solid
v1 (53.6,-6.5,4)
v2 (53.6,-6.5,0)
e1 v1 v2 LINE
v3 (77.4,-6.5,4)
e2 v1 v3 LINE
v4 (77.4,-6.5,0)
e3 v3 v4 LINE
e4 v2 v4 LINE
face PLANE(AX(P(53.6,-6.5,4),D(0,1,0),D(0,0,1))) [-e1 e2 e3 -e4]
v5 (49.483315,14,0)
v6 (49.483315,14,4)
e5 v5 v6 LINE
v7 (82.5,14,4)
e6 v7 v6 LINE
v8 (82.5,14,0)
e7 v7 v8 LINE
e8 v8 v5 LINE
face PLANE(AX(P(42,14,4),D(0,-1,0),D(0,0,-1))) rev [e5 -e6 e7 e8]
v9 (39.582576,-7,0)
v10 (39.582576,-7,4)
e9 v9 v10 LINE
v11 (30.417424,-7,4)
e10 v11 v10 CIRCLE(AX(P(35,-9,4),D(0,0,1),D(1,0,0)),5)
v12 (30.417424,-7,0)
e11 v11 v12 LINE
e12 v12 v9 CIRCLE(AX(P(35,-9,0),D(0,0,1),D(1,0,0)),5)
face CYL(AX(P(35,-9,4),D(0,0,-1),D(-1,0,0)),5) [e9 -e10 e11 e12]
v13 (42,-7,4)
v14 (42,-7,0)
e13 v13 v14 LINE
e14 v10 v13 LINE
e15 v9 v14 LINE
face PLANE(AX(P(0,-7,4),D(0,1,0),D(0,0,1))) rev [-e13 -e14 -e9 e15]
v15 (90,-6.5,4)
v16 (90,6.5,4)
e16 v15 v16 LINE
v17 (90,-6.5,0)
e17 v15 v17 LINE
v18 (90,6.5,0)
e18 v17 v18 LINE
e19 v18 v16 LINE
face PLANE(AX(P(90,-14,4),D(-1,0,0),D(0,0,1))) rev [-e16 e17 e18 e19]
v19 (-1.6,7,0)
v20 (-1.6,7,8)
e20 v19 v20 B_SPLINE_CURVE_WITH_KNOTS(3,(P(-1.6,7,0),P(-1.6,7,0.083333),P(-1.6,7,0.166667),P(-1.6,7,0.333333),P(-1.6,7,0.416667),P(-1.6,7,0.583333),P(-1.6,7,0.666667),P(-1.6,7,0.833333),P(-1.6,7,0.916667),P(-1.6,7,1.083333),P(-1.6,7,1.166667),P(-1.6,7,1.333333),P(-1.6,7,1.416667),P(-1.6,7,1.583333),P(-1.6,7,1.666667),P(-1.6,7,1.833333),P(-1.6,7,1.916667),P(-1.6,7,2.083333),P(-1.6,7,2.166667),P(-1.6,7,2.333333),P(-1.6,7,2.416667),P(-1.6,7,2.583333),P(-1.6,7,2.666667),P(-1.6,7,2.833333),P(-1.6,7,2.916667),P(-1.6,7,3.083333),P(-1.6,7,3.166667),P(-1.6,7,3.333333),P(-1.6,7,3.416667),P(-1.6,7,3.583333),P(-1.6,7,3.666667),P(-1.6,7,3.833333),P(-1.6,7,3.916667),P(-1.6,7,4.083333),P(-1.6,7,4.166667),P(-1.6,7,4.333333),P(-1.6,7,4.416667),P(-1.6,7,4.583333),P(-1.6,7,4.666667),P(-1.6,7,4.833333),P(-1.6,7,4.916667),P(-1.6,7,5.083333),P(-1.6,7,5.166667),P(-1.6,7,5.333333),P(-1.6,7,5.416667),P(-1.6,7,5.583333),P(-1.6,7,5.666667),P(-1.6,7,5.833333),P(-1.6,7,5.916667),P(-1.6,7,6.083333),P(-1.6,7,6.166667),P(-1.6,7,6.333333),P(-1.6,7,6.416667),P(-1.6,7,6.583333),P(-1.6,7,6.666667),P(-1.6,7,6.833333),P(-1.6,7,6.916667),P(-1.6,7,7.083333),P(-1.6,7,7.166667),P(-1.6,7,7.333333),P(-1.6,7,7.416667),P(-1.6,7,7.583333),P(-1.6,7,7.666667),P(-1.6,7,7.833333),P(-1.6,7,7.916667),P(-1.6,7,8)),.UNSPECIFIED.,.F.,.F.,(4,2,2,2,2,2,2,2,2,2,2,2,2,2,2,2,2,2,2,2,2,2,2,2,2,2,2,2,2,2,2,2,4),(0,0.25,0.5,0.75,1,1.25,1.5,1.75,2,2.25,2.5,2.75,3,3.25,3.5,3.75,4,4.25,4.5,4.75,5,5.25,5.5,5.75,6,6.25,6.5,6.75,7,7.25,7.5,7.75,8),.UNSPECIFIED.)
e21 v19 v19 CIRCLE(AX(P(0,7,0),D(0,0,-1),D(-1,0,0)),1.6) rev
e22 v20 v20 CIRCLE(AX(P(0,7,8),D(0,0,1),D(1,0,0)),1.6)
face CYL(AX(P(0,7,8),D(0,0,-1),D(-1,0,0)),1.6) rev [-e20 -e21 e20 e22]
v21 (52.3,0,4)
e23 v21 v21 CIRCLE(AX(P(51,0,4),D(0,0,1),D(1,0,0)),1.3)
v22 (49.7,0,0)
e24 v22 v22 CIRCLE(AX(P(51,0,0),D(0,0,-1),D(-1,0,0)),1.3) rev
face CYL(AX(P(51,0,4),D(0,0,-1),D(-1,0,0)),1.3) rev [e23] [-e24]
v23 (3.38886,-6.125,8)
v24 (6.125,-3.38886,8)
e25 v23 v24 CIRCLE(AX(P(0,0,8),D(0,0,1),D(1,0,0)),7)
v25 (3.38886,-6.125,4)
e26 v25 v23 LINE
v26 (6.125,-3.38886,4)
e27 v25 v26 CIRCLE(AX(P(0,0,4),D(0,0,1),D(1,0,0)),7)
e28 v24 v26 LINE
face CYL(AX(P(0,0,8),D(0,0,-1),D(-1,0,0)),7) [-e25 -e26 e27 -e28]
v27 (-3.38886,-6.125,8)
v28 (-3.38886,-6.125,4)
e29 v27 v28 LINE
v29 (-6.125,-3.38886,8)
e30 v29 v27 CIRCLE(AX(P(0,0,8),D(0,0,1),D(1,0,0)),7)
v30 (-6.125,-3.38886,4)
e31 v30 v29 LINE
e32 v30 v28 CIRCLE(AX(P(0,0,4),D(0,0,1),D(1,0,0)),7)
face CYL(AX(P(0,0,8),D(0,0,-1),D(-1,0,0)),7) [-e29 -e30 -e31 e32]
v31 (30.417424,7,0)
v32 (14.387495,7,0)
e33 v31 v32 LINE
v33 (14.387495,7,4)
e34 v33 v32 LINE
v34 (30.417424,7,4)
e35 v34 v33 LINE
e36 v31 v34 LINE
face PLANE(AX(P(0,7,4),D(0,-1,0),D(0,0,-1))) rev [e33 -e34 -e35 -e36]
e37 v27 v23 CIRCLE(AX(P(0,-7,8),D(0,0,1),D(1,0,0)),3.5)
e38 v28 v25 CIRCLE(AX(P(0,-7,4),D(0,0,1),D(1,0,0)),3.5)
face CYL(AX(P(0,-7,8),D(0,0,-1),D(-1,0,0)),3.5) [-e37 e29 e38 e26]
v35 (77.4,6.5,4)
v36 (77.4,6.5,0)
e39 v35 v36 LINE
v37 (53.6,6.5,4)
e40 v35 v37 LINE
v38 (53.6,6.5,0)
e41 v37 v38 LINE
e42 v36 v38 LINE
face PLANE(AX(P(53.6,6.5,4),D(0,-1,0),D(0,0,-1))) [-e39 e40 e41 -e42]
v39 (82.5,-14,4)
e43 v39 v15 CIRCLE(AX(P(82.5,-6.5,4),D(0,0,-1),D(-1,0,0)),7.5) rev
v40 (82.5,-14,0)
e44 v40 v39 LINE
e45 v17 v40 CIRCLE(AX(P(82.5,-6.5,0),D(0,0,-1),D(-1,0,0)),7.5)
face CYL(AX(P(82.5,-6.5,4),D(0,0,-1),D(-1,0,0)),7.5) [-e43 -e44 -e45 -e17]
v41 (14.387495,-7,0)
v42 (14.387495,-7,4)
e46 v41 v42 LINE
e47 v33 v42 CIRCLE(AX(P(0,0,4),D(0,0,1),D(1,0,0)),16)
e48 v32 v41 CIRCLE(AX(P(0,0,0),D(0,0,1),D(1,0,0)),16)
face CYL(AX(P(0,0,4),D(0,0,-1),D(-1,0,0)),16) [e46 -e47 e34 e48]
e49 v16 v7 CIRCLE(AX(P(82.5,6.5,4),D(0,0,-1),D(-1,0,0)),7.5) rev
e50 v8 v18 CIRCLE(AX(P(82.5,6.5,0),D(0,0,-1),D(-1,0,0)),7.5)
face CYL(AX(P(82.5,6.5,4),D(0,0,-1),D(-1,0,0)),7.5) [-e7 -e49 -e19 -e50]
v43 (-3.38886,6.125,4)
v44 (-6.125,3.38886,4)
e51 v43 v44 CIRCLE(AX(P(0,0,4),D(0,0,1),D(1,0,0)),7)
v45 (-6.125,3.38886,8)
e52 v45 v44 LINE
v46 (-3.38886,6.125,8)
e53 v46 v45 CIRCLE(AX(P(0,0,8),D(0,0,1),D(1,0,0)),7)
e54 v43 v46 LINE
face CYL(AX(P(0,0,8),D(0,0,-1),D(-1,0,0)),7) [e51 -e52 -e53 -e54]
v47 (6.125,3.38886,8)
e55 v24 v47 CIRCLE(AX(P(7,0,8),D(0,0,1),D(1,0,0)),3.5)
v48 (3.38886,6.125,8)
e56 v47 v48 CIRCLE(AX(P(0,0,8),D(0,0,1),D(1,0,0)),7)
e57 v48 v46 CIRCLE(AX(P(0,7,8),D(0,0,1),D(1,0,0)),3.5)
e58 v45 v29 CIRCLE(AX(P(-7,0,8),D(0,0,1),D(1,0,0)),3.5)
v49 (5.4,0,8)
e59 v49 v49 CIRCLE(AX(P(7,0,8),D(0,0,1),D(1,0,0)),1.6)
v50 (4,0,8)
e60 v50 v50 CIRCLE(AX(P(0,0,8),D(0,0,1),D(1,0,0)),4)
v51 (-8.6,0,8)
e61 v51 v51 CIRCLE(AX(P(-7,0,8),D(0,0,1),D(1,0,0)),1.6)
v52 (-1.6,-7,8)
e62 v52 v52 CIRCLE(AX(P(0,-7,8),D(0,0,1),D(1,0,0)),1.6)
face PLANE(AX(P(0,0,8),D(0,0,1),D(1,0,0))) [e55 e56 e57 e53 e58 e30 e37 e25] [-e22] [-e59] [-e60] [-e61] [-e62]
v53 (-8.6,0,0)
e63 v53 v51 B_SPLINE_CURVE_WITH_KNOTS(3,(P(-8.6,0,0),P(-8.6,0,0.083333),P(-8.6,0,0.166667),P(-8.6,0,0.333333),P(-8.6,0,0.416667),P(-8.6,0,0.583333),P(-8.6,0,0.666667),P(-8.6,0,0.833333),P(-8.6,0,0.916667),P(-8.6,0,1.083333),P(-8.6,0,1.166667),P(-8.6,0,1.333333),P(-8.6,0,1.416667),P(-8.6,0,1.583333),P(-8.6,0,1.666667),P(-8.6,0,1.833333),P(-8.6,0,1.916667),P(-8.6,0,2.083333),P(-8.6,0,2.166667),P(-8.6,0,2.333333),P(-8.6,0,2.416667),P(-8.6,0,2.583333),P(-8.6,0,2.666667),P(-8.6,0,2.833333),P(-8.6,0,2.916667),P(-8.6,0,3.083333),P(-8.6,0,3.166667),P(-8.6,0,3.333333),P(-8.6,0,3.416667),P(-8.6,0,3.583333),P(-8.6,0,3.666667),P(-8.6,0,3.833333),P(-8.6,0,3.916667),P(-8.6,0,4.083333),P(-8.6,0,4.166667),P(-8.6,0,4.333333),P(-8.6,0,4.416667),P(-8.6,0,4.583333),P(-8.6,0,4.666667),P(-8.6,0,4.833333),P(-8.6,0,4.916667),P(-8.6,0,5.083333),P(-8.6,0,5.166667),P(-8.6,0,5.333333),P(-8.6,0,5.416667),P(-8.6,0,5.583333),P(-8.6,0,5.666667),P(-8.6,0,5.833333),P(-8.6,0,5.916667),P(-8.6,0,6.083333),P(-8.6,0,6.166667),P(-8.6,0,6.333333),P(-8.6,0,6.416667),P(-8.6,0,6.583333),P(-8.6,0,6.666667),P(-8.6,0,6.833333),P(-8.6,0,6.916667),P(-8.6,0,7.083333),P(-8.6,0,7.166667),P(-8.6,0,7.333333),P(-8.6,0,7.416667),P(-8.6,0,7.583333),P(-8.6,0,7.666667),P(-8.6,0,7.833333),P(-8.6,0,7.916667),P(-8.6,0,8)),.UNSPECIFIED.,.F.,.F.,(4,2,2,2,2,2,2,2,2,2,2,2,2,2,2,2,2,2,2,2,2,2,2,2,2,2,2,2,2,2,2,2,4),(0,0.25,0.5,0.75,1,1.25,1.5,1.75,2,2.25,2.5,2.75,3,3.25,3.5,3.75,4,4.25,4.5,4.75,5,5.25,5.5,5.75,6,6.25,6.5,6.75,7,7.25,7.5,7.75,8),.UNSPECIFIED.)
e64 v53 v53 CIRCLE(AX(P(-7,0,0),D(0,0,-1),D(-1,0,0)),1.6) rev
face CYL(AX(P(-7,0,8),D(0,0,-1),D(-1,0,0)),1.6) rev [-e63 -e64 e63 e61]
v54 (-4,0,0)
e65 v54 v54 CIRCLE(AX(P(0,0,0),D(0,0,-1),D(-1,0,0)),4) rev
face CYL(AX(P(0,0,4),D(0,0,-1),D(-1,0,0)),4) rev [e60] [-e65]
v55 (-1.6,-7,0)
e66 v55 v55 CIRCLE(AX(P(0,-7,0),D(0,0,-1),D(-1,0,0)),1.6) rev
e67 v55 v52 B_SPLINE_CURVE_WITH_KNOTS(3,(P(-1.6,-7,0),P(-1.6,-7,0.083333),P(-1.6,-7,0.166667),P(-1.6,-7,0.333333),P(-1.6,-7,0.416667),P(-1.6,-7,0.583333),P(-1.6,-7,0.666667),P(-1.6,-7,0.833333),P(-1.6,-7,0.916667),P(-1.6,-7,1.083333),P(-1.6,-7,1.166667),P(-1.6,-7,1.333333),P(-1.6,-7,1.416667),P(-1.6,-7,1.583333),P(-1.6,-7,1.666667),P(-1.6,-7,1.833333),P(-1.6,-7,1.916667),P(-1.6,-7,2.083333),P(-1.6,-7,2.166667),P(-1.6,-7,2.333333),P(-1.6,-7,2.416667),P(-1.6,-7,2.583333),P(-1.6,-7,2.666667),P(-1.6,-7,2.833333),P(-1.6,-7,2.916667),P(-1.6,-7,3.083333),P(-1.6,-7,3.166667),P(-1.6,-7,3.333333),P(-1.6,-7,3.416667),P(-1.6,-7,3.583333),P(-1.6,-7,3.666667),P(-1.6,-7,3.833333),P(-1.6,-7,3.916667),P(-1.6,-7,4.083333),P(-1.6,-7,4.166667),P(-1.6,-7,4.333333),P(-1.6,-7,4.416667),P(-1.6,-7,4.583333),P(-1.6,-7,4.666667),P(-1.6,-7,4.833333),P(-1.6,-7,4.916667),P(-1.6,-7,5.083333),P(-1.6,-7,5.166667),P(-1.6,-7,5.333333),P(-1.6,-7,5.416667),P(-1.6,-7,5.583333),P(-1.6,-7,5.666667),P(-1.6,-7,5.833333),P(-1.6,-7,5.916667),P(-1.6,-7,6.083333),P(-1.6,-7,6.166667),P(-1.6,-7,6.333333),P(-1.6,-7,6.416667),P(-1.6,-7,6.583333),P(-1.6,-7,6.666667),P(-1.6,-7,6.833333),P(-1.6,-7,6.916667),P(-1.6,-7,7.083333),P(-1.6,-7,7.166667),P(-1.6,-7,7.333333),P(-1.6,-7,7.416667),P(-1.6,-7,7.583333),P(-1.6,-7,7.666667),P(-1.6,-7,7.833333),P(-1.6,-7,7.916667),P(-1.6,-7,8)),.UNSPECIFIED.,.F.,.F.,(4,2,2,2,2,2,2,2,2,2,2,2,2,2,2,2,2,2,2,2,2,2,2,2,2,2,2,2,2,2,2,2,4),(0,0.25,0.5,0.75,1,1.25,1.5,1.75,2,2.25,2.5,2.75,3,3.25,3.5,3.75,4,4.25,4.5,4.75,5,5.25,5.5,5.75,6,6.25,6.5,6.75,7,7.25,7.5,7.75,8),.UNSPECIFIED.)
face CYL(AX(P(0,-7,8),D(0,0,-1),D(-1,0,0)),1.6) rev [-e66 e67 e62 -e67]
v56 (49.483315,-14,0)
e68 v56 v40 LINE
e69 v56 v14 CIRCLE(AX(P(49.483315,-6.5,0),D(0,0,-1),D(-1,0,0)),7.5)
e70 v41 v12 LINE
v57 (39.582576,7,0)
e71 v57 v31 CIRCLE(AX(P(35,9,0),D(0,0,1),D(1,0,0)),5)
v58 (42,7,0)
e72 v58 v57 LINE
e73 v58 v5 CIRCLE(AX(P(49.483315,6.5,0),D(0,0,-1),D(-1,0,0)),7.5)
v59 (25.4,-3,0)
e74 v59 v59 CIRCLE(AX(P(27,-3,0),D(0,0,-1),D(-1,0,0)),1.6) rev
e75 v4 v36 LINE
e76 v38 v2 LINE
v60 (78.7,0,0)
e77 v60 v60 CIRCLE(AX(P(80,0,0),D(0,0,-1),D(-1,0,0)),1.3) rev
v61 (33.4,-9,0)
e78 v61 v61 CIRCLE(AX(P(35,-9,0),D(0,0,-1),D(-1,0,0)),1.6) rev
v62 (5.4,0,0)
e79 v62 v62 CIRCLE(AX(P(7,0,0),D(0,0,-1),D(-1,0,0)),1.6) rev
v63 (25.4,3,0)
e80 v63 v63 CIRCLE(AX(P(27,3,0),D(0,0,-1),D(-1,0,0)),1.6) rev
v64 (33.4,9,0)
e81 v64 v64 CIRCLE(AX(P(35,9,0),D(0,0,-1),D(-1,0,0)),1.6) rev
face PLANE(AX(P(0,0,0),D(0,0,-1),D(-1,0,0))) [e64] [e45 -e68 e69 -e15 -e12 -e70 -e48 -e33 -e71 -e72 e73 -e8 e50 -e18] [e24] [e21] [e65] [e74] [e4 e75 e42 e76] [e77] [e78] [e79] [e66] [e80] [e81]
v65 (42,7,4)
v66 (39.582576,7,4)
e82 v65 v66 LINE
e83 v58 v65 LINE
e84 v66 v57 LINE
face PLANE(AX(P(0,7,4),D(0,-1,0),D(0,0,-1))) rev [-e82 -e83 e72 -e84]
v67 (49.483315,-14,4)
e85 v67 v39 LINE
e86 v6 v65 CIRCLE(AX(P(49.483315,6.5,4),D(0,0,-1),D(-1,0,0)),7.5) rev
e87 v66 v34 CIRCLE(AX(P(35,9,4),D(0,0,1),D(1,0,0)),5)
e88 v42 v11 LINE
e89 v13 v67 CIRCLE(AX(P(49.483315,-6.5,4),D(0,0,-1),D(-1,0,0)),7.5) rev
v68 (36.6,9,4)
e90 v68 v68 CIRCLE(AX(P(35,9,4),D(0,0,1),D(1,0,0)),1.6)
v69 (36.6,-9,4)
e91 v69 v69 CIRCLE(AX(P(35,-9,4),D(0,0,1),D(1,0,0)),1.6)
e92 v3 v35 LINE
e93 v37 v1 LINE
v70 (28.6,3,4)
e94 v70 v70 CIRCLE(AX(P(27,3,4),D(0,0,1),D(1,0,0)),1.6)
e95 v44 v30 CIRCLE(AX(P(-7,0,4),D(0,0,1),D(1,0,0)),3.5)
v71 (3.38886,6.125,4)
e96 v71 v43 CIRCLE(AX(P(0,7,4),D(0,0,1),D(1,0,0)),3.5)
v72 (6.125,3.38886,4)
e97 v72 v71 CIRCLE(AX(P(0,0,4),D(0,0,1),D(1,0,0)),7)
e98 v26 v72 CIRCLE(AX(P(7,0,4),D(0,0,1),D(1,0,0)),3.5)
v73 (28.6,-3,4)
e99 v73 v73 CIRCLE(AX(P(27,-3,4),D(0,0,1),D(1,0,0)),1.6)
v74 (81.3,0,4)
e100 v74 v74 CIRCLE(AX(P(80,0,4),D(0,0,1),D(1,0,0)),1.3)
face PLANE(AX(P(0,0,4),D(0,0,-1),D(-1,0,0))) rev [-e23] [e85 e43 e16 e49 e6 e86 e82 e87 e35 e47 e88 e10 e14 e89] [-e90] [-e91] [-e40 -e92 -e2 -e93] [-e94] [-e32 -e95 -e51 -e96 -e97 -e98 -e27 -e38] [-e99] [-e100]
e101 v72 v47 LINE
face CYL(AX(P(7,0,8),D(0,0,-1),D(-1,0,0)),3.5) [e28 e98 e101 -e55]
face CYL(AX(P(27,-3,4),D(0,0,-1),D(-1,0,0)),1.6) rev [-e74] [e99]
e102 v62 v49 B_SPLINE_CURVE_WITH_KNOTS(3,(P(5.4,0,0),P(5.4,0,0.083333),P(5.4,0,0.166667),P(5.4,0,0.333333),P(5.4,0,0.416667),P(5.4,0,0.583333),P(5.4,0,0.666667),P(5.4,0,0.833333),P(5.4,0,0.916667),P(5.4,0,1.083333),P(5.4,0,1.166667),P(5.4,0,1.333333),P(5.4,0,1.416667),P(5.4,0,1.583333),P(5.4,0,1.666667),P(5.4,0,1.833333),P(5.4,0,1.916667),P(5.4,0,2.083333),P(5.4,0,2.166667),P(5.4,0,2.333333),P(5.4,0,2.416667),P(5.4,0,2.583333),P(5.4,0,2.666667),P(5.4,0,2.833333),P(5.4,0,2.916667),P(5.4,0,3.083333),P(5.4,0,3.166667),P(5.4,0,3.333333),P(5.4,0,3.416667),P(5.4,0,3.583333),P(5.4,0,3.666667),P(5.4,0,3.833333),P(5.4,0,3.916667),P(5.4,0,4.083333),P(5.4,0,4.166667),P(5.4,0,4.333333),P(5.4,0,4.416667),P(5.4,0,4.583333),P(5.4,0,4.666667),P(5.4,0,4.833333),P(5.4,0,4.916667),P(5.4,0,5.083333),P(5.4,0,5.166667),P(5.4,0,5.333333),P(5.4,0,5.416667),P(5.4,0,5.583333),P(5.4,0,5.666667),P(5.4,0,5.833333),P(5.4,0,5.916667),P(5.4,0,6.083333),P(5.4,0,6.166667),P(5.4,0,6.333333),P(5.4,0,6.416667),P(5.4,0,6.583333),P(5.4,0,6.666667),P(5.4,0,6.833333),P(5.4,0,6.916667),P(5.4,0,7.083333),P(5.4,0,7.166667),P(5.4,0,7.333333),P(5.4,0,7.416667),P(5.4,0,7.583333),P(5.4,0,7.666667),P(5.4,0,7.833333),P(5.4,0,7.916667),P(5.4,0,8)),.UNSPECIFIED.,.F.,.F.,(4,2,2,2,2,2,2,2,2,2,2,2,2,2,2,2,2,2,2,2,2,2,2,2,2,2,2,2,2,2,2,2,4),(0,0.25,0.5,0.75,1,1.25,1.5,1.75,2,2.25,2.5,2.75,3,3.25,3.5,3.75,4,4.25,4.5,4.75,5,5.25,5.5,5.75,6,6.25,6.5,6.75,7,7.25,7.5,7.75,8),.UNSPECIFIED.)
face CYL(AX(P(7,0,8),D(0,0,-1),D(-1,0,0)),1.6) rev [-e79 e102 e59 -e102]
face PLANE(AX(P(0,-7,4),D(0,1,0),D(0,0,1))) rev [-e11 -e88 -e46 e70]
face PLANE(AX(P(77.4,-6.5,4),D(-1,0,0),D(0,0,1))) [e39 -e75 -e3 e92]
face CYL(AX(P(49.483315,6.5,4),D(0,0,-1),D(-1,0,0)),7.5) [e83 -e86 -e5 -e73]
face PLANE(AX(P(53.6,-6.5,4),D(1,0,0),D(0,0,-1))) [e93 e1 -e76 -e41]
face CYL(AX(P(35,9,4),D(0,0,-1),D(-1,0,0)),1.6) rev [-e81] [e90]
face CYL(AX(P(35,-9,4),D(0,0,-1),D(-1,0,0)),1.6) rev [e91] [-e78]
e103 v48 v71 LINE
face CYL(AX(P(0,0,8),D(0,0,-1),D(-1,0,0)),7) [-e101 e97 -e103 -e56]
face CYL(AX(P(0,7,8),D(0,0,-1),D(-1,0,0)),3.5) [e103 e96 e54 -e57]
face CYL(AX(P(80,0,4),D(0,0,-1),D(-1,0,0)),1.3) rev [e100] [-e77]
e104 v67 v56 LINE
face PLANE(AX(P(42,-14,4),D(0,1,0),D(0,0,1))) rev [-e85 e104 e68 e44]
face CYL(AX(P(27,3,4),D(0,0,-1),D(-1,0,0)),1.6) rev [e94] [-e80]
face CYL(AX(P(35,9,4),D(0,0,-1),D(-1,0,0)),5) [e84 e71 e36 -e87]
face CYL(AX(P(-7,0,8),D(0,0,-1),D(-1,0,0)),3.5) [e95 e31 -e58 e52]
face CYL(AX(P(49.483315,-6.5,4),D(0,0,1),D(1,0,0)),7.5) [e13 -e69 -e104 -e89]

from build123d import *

# Parameters (mm, degrees)
MAIN_WEB_PROFILE_W                      = 60
MAIN_WEB_PROFILE_H                      = 14
MAIN_WEB_DEPTH                          = 4
SHOULDER_HORN_FLANGE_PROFILE_R          = 16
SHOULDER_HORN_FLANGE_DEPTH              = 4
ELBOW_SERVO_MOUNT_PROFILE_W             = 48
ELBOW_SERVO_MOUNT_PROFILE_H             = 28
ELBOW_SERVO_MOUNT_DEPTH                 = 4
SG90_BODY_CLEARANCE_START               = -5
SG90_BODY_CLEARANCE_PROFILE_W           = 23.8
SG90_BODY_CLEARANCE_PROFILE_H           = 13
SG90_BODY_CLEARANCE_DEPTH               = 97.49863387
ELBOW_TAB_FASTENERS_START               = -50
ELBOW_TAB_FASTENERS_PROFILE_R           = 1.3
ELBOW_TAB_FASTENERS_DEPTH               = 142.49863387
SHOULDER_CENTER_SCREW_ACCESS_START      = -50
SHOULDER_CENTER_SCREW_ACCESS_PROFILE_R  = 4
SHOULDER_CENTER_SCREW_ACCESS_DEPTH      = 142.49863387
CABLE_TIE_HOLES_START                   = -50
CABLE_TIE_HOLES_PROFILE_R               = 1.6
CABLE_TIE_HOLES_DEPTH                   = 142.49863387
PASSIVE_LOWER_MOUNT_BOSS_PROFILE_R      = 5
PASSIVE_LOWER_MOUNT_BOSS_DEPTH          = 4
PASSIVE_UPPER_MOUNT_BOSS_PROFILE_R      = 5
PASSIVE_UPPER_MOUNT_BOSS_DEPTH          = 4
PASSIVE_CHEEK_STANDOFFS_START           = -50
PASSIVE_CHEEK_STANDOFFS_PROFILE_R       = 1.6
PASSIVE_CHEEK_STANDOFFS_DEPTH           = 142.49863387
SHOULDER_DOWEL_SUPPORT_HUB_START        = 4
SHOULDER_DOWEL_SUPPORT_HUB_PROFILE_R    = 7
SHOULDER_DOWEL_SUPPORT_HUB_PROFILE_R_2  = 4
SHOULDER_DOWEL_SUPPORT_HUB_DEPTH        = 4
RAISED_M3_WASHER_SEATS_HEIGHT8_START    = 4
RAISED_M3_WASHER_SEATS_PCD14_PROFILE_R  = 3.5
RAISED_M3_WASHER_SEATS_HEIGHT8_DEPTH    = 4
METAL_HORN_M3_CLEARANCE_PCD14_START     = -50
METAL_HORN_M3_CLEARANCE_PCD14_PROFILE_R = 1.6
METAL_HORN_M3_CLEARANCE_PCD14_DEPTH     = 142.760557976
RESTORE_SHOULDER_SLEEVE_BORE_START      = -50
RESTORE_SHOULDER_SLEEVE_BORE_PROFILE_R  = 4
RESTORE_SHOULDER_SLEEVE_BORE_DEPTH      = 142.760557976
FILLET1_R                               = 7.5


with BuildPart() as part:
    # Main_web_profile → Main_web (new body)
    with BuildSketch(Plane.XY):
        with Locations((30, 0)):
            Rectangle(MAIN_WEB_PROFILE_W, MAIN_WEB_PROFILE_H)
    extrude(amount=MAIN_WEB_DEPTH)

    # Shoulder_horn_flange_profile → Shoulder_horn_flange (add)
    with BuildSketch(Plane.XY):
        Circle(SHOULDER_HORN_FLANGE_PROFILE_R)
    extrude(amount=SHOULDER_HORN_FLANGE_DEPTH)

    # Elbow_servo_mount_profile → Elbow_servo_mount (add)
    with BuildSketch(Plane.XY):
        with Locations((66, 0)):
            Rectangle(ELBOW_SERVO_MOUNT_PROFILE_W, ELBOW_SERVO_MOUNT_PROFILE_H)
    extrude(amount=ELBOW_SERVO_MOUNT_DEPTH)

    # SG90_body_clearance_profile → SG90_body_clearance (cut, through all)
    with BuildSketch(Plane.XY.offset(SG90_BODY_CLEARANCE_START)):
        with Locations((65.5, 0)):
            Rectangle(SG90_BODY_CLEARANCE_PROFILE_W, SG90_BODY_CLEARANCE_PROFILE_H)
    extrude(amount=SG90_BODY_CLEARANCE_DEPTH, mode=Mode.SUBTRACT)

    # Elbow_tab_fasteners_profile → Elbow_tab_fasteners (cut, through all)
    with BuildSketch(Plane.XY.offset(ELBOW_TAB_FASTENERS_START)):
        with Locations(Location((51, 0, 0), (0, 0, 180))):
            Circle(ELBOW_TAB_FASTENERS_PROFILE_R)
        with Locations(Location((80, 0, 0), (0, 0, 180))):
            Circle(ELBOW_TAB_FASTENERS_PROFILE_R)
    extrude(amount=ELBOW_TAB_FASTENERS_DEPTH, mode=Mode.SUBTRACT)

    # Shoulder_center_screw_access_profile → Shoulder_center_screw_access (cut, through all)
    with BuildSketch(Plane.XY.offset(SHOULDER_CENTER_SCREW_ACCESS_START)):
        with Locations(Location((0, 0, 0), (0, 0, 180))):
            Circle(SHOULDER_CENTER_SCREW_ACCESS_PROFILE_R)
    extrude(amount=SHOULDER_CENTER_SCREW_ACCESS_DEPTH, mode=Mode.SUBTRACT)

    # Cable_tie_holes_profile → Cable_tie_holes (cut, through all)
    with BuildSketch(Plane.XY.offset(CABLE_TIE_HOLES_START)):
        with Locations(Location((27, -3, 0), (0, 0, 180))):
            Circle(CABLE_TIE_HOLES_PROFILE_R)
        with Locations(Location((27, 3, 0), (0, 0, 180))):
            Circle(CABLE_TIE_HOLES_PROFILE_R)
    extrude(amount=CABLE_TIE_HOLES_DEPTH, mode=Mode.SUBTRACT)

    # Passive_lower_mount_boss_profile → Passive_lower_mount_boss (add)
    with BuildSketch(Plane.XY):
        with Locations((35, -9)):
            Circle(PASSIVE_LOWER_MOUNT_BOSS_PROFILE_R)
    extrude(amount=PASSIVE_LOWER_MOUNT_BOSS_DEPTH)

    # Passive_upper_mount_boss_profile → Passive_upper_mount_boss (add)
    with BuildSketch(Plane.XY):
        with Locations((35, 9)):
            Circle(PASSIVE_UPPER_MOUNT_BOSS_PROFILE_R)
    extrude(amount=PASSIVE_UPPER_MOUNT_BOSS_DEPTH)

    # Passive_cheek_standoffs_profile → Passive_cheek_standoffs (cut, through all)
    with BuildSketch(Plane.XY.offset(PASSIVE_CHEEK_STANDOFFS_START)):
        with Locations(Location((35, -9, 0), (0, 0, 180))):
            Circle(PASSIVE_CHEEK_STANDOFFS_PROFILE_R)
        with Locations(Location((35, 9, 0), (0, 0, 180))):
            Circle(PASSIVE_CHEEK_STANDOFFS_PROFILE_R)
    extrude(amount=PASSIVE_CHEEK_STANDOFFS_DEPTH, mode=Mode.SUBTRACT)

    # Shoulder_dowel_support_hub_profile → Shoulder_dowel_support_hub (add)
    with BuildSketch(Plane.XY.offset(SHOULDER_DOWEL_SUPPORT_HUB_START)):
        Circle(SHOULDER_DOWEL_SUPPORT_HUB_PROFILE_R)
        with Locations(Location((0, 0, 0), (0, 0, 180))):
            Circle(SHOULDER_DOWEL_SUPPORT_HUB_PROFILE_R_2, mode=Mode.SUBTRACT)
    extrude(amount=SHOULDER_DOWEL_SUPPORT_HUB_DEPTH)

    # Raised_M3_washer_seats_PCD14_profile → Raised_M3_washer_seats_height8 (add)
    with BuildSketch(Plane.XY.offset(RAISED_M3_WASHER_SEATS_HEIGHT8_START)):
        with Locations((7, 0)):
            Circle(RAISED_M3_WASHER_SEATS_PCD14_PROFILE_R)
        with Locations((-7, 0)):
            Circle(RAISED_M3_WASHER_SEATS_PCD14_PROFILE_R)
        with Locations((0, 7)):
            Circle(RAISED_M3_WASHER_SEATS_PCD14_PROFILE_R)
        with Locations((0, -7)):
            Circle(RAISED_M3_WASHER_SEATS_PCD14_PROFILE_R)
    extrude(amount=RAISED_M3_WASHER_SEATS_HEIGHT8_DEPTH)

    # Metal_horn_M3_clearance_PCD14_profile → Metal_horn_M3_clearance_PCD14 (cut, through all)
    with BuildSketch(Plane.XY.offset(METAL_HORN_M3_CLEARANCE_PCD14_START)):
        with Locations(Location((7, 0, 0), (0, 0, 180))):
            Circle(METAL_HORN_M3_CLEARANCE_PCD14_PROFILE_R)
        with Locations(Location((-7, 0, 0), (0, 0, 180))):
            Circle(METAL_HORN_M3_CLEARANCE_PCD14_PROFILE_R)
        with Locations(Location((0, 7, 0), (0, 0, 180))):
            Circle(METAL_HORN_M3_CLEARANCE_PCD14_PROFILE_R)
        with Locations(Location((0, -7, 0), (0, 0, 180))):
            Circle(METAL_HORN_M3_CLEARANCE_PCD14_PROFILE_R)
    extrude(amount=METAL_HORN_M3_CLEARANCE_PCD14_DEPTH, mode=Mode.SUBTRACT)

    # Restore_shoulder_sleeve_bore_profile → Restore_shoulder_sleeve_bore (cut, through all)
    with BuildSketch(Plane.XY.offset(RESTORE_SHOULDER_SLEEVE_BORE_START)):
        with Locations(Location((0, 0, 0), (0, 0, 180))):
            Circle(RESTORE_SHOULDER_SLEEVE_BORE_PROFILE_R)
    extrude(amount=RESTORE_SHOULDER_SLEEVE_BORE_DEPTH, mode=Mode.SUBTRACT)

    # Fillet1
    # the kernel refuses this fillet: 7.5 mm, written as the material it takes off along each edge
    with BuildSketch(Plane(origin=(42, -14, -18.708286934), x_dir=(0, 1, 0), z_dir=(0, 0, 1))) as fillet1_piece_1:
        with BuildLine():
            CenterArc((7.5, -7.483314774), FILLET1_R, 93.822553729, 86.177446271)
            Line((0, -7.483314774), (-0.15, -7.483314774))
            Line((-0.15, -7.483314774), (-0.15, 0))
            Line((-0.15, 0), (0, 0.15))
            ThreePointArc((0, 0.15), (3.5, 0.15), (6.99, 0.149666295))
            Line((6.99, 0.149666295), (7, 0))
        make_face()
    extrude(amount=41.416573868, mode=Mode.SUBTRACT)
    with BuildSketch(Plane(origin=(90, -14, -18.75), x_dir=(-1, 0, 0), z_dir=(0, 0, 1)), Plane(origin=(90, 14, -18.75), x_dir=(0, -1, 0), z_dir=(0, 0, 1))) as fillet1_piece_2:
        with BuildLine():
            CenterArc((FILLET1_R, -FILLET1_R), FILLET1_R, 90, 90)
            Line((0, -FILLET1_R), (-FILLET1_R * 0.02, -FILLET1_R))
            Line((-FILLET1_R * 0.02, -FILLET1_R), (-FILLET1_R * 0.02, FILLET1_R * 0.02))
            Line((-FILLET1_R * 0.02, FILLET1_R * 0.02), (FILLET1_R, FILLET1_R * 0.02))
            Line((FILLET1_R, FILLET1_R * 0.02), (FILLET1_R, 0))
        make_face()
    extrude(amount=41.5, mode=Mode.SUBTRACT)
    with BuildSketch(Plane(origin=(42, 14, -18.708286934), x_dir=(0, -1, 0), z_dir=(0, 0, 1))) as fillet1_piece_3:
        with BuildLine():
            CenterArc((7.5, 7.483314774), FILLET1_R, 180, 86.177446271)
            Line((0, 7.483314774), (-0.15, 7.483314774))
            Line((-0.15, 7.483314774), (-0.15, 0))
            Line((-0.15, 0), (0, -0.15))
            ThreePointArc((0, -0.15), (3.5, -0.15), (6.99, -0.149666295))
            Line((6.99, -0.149666295), (7, 0))
        make_face()
    extrude(amount=41.416573868, mode=Mode.SUBTRACT)


solid = part.part
